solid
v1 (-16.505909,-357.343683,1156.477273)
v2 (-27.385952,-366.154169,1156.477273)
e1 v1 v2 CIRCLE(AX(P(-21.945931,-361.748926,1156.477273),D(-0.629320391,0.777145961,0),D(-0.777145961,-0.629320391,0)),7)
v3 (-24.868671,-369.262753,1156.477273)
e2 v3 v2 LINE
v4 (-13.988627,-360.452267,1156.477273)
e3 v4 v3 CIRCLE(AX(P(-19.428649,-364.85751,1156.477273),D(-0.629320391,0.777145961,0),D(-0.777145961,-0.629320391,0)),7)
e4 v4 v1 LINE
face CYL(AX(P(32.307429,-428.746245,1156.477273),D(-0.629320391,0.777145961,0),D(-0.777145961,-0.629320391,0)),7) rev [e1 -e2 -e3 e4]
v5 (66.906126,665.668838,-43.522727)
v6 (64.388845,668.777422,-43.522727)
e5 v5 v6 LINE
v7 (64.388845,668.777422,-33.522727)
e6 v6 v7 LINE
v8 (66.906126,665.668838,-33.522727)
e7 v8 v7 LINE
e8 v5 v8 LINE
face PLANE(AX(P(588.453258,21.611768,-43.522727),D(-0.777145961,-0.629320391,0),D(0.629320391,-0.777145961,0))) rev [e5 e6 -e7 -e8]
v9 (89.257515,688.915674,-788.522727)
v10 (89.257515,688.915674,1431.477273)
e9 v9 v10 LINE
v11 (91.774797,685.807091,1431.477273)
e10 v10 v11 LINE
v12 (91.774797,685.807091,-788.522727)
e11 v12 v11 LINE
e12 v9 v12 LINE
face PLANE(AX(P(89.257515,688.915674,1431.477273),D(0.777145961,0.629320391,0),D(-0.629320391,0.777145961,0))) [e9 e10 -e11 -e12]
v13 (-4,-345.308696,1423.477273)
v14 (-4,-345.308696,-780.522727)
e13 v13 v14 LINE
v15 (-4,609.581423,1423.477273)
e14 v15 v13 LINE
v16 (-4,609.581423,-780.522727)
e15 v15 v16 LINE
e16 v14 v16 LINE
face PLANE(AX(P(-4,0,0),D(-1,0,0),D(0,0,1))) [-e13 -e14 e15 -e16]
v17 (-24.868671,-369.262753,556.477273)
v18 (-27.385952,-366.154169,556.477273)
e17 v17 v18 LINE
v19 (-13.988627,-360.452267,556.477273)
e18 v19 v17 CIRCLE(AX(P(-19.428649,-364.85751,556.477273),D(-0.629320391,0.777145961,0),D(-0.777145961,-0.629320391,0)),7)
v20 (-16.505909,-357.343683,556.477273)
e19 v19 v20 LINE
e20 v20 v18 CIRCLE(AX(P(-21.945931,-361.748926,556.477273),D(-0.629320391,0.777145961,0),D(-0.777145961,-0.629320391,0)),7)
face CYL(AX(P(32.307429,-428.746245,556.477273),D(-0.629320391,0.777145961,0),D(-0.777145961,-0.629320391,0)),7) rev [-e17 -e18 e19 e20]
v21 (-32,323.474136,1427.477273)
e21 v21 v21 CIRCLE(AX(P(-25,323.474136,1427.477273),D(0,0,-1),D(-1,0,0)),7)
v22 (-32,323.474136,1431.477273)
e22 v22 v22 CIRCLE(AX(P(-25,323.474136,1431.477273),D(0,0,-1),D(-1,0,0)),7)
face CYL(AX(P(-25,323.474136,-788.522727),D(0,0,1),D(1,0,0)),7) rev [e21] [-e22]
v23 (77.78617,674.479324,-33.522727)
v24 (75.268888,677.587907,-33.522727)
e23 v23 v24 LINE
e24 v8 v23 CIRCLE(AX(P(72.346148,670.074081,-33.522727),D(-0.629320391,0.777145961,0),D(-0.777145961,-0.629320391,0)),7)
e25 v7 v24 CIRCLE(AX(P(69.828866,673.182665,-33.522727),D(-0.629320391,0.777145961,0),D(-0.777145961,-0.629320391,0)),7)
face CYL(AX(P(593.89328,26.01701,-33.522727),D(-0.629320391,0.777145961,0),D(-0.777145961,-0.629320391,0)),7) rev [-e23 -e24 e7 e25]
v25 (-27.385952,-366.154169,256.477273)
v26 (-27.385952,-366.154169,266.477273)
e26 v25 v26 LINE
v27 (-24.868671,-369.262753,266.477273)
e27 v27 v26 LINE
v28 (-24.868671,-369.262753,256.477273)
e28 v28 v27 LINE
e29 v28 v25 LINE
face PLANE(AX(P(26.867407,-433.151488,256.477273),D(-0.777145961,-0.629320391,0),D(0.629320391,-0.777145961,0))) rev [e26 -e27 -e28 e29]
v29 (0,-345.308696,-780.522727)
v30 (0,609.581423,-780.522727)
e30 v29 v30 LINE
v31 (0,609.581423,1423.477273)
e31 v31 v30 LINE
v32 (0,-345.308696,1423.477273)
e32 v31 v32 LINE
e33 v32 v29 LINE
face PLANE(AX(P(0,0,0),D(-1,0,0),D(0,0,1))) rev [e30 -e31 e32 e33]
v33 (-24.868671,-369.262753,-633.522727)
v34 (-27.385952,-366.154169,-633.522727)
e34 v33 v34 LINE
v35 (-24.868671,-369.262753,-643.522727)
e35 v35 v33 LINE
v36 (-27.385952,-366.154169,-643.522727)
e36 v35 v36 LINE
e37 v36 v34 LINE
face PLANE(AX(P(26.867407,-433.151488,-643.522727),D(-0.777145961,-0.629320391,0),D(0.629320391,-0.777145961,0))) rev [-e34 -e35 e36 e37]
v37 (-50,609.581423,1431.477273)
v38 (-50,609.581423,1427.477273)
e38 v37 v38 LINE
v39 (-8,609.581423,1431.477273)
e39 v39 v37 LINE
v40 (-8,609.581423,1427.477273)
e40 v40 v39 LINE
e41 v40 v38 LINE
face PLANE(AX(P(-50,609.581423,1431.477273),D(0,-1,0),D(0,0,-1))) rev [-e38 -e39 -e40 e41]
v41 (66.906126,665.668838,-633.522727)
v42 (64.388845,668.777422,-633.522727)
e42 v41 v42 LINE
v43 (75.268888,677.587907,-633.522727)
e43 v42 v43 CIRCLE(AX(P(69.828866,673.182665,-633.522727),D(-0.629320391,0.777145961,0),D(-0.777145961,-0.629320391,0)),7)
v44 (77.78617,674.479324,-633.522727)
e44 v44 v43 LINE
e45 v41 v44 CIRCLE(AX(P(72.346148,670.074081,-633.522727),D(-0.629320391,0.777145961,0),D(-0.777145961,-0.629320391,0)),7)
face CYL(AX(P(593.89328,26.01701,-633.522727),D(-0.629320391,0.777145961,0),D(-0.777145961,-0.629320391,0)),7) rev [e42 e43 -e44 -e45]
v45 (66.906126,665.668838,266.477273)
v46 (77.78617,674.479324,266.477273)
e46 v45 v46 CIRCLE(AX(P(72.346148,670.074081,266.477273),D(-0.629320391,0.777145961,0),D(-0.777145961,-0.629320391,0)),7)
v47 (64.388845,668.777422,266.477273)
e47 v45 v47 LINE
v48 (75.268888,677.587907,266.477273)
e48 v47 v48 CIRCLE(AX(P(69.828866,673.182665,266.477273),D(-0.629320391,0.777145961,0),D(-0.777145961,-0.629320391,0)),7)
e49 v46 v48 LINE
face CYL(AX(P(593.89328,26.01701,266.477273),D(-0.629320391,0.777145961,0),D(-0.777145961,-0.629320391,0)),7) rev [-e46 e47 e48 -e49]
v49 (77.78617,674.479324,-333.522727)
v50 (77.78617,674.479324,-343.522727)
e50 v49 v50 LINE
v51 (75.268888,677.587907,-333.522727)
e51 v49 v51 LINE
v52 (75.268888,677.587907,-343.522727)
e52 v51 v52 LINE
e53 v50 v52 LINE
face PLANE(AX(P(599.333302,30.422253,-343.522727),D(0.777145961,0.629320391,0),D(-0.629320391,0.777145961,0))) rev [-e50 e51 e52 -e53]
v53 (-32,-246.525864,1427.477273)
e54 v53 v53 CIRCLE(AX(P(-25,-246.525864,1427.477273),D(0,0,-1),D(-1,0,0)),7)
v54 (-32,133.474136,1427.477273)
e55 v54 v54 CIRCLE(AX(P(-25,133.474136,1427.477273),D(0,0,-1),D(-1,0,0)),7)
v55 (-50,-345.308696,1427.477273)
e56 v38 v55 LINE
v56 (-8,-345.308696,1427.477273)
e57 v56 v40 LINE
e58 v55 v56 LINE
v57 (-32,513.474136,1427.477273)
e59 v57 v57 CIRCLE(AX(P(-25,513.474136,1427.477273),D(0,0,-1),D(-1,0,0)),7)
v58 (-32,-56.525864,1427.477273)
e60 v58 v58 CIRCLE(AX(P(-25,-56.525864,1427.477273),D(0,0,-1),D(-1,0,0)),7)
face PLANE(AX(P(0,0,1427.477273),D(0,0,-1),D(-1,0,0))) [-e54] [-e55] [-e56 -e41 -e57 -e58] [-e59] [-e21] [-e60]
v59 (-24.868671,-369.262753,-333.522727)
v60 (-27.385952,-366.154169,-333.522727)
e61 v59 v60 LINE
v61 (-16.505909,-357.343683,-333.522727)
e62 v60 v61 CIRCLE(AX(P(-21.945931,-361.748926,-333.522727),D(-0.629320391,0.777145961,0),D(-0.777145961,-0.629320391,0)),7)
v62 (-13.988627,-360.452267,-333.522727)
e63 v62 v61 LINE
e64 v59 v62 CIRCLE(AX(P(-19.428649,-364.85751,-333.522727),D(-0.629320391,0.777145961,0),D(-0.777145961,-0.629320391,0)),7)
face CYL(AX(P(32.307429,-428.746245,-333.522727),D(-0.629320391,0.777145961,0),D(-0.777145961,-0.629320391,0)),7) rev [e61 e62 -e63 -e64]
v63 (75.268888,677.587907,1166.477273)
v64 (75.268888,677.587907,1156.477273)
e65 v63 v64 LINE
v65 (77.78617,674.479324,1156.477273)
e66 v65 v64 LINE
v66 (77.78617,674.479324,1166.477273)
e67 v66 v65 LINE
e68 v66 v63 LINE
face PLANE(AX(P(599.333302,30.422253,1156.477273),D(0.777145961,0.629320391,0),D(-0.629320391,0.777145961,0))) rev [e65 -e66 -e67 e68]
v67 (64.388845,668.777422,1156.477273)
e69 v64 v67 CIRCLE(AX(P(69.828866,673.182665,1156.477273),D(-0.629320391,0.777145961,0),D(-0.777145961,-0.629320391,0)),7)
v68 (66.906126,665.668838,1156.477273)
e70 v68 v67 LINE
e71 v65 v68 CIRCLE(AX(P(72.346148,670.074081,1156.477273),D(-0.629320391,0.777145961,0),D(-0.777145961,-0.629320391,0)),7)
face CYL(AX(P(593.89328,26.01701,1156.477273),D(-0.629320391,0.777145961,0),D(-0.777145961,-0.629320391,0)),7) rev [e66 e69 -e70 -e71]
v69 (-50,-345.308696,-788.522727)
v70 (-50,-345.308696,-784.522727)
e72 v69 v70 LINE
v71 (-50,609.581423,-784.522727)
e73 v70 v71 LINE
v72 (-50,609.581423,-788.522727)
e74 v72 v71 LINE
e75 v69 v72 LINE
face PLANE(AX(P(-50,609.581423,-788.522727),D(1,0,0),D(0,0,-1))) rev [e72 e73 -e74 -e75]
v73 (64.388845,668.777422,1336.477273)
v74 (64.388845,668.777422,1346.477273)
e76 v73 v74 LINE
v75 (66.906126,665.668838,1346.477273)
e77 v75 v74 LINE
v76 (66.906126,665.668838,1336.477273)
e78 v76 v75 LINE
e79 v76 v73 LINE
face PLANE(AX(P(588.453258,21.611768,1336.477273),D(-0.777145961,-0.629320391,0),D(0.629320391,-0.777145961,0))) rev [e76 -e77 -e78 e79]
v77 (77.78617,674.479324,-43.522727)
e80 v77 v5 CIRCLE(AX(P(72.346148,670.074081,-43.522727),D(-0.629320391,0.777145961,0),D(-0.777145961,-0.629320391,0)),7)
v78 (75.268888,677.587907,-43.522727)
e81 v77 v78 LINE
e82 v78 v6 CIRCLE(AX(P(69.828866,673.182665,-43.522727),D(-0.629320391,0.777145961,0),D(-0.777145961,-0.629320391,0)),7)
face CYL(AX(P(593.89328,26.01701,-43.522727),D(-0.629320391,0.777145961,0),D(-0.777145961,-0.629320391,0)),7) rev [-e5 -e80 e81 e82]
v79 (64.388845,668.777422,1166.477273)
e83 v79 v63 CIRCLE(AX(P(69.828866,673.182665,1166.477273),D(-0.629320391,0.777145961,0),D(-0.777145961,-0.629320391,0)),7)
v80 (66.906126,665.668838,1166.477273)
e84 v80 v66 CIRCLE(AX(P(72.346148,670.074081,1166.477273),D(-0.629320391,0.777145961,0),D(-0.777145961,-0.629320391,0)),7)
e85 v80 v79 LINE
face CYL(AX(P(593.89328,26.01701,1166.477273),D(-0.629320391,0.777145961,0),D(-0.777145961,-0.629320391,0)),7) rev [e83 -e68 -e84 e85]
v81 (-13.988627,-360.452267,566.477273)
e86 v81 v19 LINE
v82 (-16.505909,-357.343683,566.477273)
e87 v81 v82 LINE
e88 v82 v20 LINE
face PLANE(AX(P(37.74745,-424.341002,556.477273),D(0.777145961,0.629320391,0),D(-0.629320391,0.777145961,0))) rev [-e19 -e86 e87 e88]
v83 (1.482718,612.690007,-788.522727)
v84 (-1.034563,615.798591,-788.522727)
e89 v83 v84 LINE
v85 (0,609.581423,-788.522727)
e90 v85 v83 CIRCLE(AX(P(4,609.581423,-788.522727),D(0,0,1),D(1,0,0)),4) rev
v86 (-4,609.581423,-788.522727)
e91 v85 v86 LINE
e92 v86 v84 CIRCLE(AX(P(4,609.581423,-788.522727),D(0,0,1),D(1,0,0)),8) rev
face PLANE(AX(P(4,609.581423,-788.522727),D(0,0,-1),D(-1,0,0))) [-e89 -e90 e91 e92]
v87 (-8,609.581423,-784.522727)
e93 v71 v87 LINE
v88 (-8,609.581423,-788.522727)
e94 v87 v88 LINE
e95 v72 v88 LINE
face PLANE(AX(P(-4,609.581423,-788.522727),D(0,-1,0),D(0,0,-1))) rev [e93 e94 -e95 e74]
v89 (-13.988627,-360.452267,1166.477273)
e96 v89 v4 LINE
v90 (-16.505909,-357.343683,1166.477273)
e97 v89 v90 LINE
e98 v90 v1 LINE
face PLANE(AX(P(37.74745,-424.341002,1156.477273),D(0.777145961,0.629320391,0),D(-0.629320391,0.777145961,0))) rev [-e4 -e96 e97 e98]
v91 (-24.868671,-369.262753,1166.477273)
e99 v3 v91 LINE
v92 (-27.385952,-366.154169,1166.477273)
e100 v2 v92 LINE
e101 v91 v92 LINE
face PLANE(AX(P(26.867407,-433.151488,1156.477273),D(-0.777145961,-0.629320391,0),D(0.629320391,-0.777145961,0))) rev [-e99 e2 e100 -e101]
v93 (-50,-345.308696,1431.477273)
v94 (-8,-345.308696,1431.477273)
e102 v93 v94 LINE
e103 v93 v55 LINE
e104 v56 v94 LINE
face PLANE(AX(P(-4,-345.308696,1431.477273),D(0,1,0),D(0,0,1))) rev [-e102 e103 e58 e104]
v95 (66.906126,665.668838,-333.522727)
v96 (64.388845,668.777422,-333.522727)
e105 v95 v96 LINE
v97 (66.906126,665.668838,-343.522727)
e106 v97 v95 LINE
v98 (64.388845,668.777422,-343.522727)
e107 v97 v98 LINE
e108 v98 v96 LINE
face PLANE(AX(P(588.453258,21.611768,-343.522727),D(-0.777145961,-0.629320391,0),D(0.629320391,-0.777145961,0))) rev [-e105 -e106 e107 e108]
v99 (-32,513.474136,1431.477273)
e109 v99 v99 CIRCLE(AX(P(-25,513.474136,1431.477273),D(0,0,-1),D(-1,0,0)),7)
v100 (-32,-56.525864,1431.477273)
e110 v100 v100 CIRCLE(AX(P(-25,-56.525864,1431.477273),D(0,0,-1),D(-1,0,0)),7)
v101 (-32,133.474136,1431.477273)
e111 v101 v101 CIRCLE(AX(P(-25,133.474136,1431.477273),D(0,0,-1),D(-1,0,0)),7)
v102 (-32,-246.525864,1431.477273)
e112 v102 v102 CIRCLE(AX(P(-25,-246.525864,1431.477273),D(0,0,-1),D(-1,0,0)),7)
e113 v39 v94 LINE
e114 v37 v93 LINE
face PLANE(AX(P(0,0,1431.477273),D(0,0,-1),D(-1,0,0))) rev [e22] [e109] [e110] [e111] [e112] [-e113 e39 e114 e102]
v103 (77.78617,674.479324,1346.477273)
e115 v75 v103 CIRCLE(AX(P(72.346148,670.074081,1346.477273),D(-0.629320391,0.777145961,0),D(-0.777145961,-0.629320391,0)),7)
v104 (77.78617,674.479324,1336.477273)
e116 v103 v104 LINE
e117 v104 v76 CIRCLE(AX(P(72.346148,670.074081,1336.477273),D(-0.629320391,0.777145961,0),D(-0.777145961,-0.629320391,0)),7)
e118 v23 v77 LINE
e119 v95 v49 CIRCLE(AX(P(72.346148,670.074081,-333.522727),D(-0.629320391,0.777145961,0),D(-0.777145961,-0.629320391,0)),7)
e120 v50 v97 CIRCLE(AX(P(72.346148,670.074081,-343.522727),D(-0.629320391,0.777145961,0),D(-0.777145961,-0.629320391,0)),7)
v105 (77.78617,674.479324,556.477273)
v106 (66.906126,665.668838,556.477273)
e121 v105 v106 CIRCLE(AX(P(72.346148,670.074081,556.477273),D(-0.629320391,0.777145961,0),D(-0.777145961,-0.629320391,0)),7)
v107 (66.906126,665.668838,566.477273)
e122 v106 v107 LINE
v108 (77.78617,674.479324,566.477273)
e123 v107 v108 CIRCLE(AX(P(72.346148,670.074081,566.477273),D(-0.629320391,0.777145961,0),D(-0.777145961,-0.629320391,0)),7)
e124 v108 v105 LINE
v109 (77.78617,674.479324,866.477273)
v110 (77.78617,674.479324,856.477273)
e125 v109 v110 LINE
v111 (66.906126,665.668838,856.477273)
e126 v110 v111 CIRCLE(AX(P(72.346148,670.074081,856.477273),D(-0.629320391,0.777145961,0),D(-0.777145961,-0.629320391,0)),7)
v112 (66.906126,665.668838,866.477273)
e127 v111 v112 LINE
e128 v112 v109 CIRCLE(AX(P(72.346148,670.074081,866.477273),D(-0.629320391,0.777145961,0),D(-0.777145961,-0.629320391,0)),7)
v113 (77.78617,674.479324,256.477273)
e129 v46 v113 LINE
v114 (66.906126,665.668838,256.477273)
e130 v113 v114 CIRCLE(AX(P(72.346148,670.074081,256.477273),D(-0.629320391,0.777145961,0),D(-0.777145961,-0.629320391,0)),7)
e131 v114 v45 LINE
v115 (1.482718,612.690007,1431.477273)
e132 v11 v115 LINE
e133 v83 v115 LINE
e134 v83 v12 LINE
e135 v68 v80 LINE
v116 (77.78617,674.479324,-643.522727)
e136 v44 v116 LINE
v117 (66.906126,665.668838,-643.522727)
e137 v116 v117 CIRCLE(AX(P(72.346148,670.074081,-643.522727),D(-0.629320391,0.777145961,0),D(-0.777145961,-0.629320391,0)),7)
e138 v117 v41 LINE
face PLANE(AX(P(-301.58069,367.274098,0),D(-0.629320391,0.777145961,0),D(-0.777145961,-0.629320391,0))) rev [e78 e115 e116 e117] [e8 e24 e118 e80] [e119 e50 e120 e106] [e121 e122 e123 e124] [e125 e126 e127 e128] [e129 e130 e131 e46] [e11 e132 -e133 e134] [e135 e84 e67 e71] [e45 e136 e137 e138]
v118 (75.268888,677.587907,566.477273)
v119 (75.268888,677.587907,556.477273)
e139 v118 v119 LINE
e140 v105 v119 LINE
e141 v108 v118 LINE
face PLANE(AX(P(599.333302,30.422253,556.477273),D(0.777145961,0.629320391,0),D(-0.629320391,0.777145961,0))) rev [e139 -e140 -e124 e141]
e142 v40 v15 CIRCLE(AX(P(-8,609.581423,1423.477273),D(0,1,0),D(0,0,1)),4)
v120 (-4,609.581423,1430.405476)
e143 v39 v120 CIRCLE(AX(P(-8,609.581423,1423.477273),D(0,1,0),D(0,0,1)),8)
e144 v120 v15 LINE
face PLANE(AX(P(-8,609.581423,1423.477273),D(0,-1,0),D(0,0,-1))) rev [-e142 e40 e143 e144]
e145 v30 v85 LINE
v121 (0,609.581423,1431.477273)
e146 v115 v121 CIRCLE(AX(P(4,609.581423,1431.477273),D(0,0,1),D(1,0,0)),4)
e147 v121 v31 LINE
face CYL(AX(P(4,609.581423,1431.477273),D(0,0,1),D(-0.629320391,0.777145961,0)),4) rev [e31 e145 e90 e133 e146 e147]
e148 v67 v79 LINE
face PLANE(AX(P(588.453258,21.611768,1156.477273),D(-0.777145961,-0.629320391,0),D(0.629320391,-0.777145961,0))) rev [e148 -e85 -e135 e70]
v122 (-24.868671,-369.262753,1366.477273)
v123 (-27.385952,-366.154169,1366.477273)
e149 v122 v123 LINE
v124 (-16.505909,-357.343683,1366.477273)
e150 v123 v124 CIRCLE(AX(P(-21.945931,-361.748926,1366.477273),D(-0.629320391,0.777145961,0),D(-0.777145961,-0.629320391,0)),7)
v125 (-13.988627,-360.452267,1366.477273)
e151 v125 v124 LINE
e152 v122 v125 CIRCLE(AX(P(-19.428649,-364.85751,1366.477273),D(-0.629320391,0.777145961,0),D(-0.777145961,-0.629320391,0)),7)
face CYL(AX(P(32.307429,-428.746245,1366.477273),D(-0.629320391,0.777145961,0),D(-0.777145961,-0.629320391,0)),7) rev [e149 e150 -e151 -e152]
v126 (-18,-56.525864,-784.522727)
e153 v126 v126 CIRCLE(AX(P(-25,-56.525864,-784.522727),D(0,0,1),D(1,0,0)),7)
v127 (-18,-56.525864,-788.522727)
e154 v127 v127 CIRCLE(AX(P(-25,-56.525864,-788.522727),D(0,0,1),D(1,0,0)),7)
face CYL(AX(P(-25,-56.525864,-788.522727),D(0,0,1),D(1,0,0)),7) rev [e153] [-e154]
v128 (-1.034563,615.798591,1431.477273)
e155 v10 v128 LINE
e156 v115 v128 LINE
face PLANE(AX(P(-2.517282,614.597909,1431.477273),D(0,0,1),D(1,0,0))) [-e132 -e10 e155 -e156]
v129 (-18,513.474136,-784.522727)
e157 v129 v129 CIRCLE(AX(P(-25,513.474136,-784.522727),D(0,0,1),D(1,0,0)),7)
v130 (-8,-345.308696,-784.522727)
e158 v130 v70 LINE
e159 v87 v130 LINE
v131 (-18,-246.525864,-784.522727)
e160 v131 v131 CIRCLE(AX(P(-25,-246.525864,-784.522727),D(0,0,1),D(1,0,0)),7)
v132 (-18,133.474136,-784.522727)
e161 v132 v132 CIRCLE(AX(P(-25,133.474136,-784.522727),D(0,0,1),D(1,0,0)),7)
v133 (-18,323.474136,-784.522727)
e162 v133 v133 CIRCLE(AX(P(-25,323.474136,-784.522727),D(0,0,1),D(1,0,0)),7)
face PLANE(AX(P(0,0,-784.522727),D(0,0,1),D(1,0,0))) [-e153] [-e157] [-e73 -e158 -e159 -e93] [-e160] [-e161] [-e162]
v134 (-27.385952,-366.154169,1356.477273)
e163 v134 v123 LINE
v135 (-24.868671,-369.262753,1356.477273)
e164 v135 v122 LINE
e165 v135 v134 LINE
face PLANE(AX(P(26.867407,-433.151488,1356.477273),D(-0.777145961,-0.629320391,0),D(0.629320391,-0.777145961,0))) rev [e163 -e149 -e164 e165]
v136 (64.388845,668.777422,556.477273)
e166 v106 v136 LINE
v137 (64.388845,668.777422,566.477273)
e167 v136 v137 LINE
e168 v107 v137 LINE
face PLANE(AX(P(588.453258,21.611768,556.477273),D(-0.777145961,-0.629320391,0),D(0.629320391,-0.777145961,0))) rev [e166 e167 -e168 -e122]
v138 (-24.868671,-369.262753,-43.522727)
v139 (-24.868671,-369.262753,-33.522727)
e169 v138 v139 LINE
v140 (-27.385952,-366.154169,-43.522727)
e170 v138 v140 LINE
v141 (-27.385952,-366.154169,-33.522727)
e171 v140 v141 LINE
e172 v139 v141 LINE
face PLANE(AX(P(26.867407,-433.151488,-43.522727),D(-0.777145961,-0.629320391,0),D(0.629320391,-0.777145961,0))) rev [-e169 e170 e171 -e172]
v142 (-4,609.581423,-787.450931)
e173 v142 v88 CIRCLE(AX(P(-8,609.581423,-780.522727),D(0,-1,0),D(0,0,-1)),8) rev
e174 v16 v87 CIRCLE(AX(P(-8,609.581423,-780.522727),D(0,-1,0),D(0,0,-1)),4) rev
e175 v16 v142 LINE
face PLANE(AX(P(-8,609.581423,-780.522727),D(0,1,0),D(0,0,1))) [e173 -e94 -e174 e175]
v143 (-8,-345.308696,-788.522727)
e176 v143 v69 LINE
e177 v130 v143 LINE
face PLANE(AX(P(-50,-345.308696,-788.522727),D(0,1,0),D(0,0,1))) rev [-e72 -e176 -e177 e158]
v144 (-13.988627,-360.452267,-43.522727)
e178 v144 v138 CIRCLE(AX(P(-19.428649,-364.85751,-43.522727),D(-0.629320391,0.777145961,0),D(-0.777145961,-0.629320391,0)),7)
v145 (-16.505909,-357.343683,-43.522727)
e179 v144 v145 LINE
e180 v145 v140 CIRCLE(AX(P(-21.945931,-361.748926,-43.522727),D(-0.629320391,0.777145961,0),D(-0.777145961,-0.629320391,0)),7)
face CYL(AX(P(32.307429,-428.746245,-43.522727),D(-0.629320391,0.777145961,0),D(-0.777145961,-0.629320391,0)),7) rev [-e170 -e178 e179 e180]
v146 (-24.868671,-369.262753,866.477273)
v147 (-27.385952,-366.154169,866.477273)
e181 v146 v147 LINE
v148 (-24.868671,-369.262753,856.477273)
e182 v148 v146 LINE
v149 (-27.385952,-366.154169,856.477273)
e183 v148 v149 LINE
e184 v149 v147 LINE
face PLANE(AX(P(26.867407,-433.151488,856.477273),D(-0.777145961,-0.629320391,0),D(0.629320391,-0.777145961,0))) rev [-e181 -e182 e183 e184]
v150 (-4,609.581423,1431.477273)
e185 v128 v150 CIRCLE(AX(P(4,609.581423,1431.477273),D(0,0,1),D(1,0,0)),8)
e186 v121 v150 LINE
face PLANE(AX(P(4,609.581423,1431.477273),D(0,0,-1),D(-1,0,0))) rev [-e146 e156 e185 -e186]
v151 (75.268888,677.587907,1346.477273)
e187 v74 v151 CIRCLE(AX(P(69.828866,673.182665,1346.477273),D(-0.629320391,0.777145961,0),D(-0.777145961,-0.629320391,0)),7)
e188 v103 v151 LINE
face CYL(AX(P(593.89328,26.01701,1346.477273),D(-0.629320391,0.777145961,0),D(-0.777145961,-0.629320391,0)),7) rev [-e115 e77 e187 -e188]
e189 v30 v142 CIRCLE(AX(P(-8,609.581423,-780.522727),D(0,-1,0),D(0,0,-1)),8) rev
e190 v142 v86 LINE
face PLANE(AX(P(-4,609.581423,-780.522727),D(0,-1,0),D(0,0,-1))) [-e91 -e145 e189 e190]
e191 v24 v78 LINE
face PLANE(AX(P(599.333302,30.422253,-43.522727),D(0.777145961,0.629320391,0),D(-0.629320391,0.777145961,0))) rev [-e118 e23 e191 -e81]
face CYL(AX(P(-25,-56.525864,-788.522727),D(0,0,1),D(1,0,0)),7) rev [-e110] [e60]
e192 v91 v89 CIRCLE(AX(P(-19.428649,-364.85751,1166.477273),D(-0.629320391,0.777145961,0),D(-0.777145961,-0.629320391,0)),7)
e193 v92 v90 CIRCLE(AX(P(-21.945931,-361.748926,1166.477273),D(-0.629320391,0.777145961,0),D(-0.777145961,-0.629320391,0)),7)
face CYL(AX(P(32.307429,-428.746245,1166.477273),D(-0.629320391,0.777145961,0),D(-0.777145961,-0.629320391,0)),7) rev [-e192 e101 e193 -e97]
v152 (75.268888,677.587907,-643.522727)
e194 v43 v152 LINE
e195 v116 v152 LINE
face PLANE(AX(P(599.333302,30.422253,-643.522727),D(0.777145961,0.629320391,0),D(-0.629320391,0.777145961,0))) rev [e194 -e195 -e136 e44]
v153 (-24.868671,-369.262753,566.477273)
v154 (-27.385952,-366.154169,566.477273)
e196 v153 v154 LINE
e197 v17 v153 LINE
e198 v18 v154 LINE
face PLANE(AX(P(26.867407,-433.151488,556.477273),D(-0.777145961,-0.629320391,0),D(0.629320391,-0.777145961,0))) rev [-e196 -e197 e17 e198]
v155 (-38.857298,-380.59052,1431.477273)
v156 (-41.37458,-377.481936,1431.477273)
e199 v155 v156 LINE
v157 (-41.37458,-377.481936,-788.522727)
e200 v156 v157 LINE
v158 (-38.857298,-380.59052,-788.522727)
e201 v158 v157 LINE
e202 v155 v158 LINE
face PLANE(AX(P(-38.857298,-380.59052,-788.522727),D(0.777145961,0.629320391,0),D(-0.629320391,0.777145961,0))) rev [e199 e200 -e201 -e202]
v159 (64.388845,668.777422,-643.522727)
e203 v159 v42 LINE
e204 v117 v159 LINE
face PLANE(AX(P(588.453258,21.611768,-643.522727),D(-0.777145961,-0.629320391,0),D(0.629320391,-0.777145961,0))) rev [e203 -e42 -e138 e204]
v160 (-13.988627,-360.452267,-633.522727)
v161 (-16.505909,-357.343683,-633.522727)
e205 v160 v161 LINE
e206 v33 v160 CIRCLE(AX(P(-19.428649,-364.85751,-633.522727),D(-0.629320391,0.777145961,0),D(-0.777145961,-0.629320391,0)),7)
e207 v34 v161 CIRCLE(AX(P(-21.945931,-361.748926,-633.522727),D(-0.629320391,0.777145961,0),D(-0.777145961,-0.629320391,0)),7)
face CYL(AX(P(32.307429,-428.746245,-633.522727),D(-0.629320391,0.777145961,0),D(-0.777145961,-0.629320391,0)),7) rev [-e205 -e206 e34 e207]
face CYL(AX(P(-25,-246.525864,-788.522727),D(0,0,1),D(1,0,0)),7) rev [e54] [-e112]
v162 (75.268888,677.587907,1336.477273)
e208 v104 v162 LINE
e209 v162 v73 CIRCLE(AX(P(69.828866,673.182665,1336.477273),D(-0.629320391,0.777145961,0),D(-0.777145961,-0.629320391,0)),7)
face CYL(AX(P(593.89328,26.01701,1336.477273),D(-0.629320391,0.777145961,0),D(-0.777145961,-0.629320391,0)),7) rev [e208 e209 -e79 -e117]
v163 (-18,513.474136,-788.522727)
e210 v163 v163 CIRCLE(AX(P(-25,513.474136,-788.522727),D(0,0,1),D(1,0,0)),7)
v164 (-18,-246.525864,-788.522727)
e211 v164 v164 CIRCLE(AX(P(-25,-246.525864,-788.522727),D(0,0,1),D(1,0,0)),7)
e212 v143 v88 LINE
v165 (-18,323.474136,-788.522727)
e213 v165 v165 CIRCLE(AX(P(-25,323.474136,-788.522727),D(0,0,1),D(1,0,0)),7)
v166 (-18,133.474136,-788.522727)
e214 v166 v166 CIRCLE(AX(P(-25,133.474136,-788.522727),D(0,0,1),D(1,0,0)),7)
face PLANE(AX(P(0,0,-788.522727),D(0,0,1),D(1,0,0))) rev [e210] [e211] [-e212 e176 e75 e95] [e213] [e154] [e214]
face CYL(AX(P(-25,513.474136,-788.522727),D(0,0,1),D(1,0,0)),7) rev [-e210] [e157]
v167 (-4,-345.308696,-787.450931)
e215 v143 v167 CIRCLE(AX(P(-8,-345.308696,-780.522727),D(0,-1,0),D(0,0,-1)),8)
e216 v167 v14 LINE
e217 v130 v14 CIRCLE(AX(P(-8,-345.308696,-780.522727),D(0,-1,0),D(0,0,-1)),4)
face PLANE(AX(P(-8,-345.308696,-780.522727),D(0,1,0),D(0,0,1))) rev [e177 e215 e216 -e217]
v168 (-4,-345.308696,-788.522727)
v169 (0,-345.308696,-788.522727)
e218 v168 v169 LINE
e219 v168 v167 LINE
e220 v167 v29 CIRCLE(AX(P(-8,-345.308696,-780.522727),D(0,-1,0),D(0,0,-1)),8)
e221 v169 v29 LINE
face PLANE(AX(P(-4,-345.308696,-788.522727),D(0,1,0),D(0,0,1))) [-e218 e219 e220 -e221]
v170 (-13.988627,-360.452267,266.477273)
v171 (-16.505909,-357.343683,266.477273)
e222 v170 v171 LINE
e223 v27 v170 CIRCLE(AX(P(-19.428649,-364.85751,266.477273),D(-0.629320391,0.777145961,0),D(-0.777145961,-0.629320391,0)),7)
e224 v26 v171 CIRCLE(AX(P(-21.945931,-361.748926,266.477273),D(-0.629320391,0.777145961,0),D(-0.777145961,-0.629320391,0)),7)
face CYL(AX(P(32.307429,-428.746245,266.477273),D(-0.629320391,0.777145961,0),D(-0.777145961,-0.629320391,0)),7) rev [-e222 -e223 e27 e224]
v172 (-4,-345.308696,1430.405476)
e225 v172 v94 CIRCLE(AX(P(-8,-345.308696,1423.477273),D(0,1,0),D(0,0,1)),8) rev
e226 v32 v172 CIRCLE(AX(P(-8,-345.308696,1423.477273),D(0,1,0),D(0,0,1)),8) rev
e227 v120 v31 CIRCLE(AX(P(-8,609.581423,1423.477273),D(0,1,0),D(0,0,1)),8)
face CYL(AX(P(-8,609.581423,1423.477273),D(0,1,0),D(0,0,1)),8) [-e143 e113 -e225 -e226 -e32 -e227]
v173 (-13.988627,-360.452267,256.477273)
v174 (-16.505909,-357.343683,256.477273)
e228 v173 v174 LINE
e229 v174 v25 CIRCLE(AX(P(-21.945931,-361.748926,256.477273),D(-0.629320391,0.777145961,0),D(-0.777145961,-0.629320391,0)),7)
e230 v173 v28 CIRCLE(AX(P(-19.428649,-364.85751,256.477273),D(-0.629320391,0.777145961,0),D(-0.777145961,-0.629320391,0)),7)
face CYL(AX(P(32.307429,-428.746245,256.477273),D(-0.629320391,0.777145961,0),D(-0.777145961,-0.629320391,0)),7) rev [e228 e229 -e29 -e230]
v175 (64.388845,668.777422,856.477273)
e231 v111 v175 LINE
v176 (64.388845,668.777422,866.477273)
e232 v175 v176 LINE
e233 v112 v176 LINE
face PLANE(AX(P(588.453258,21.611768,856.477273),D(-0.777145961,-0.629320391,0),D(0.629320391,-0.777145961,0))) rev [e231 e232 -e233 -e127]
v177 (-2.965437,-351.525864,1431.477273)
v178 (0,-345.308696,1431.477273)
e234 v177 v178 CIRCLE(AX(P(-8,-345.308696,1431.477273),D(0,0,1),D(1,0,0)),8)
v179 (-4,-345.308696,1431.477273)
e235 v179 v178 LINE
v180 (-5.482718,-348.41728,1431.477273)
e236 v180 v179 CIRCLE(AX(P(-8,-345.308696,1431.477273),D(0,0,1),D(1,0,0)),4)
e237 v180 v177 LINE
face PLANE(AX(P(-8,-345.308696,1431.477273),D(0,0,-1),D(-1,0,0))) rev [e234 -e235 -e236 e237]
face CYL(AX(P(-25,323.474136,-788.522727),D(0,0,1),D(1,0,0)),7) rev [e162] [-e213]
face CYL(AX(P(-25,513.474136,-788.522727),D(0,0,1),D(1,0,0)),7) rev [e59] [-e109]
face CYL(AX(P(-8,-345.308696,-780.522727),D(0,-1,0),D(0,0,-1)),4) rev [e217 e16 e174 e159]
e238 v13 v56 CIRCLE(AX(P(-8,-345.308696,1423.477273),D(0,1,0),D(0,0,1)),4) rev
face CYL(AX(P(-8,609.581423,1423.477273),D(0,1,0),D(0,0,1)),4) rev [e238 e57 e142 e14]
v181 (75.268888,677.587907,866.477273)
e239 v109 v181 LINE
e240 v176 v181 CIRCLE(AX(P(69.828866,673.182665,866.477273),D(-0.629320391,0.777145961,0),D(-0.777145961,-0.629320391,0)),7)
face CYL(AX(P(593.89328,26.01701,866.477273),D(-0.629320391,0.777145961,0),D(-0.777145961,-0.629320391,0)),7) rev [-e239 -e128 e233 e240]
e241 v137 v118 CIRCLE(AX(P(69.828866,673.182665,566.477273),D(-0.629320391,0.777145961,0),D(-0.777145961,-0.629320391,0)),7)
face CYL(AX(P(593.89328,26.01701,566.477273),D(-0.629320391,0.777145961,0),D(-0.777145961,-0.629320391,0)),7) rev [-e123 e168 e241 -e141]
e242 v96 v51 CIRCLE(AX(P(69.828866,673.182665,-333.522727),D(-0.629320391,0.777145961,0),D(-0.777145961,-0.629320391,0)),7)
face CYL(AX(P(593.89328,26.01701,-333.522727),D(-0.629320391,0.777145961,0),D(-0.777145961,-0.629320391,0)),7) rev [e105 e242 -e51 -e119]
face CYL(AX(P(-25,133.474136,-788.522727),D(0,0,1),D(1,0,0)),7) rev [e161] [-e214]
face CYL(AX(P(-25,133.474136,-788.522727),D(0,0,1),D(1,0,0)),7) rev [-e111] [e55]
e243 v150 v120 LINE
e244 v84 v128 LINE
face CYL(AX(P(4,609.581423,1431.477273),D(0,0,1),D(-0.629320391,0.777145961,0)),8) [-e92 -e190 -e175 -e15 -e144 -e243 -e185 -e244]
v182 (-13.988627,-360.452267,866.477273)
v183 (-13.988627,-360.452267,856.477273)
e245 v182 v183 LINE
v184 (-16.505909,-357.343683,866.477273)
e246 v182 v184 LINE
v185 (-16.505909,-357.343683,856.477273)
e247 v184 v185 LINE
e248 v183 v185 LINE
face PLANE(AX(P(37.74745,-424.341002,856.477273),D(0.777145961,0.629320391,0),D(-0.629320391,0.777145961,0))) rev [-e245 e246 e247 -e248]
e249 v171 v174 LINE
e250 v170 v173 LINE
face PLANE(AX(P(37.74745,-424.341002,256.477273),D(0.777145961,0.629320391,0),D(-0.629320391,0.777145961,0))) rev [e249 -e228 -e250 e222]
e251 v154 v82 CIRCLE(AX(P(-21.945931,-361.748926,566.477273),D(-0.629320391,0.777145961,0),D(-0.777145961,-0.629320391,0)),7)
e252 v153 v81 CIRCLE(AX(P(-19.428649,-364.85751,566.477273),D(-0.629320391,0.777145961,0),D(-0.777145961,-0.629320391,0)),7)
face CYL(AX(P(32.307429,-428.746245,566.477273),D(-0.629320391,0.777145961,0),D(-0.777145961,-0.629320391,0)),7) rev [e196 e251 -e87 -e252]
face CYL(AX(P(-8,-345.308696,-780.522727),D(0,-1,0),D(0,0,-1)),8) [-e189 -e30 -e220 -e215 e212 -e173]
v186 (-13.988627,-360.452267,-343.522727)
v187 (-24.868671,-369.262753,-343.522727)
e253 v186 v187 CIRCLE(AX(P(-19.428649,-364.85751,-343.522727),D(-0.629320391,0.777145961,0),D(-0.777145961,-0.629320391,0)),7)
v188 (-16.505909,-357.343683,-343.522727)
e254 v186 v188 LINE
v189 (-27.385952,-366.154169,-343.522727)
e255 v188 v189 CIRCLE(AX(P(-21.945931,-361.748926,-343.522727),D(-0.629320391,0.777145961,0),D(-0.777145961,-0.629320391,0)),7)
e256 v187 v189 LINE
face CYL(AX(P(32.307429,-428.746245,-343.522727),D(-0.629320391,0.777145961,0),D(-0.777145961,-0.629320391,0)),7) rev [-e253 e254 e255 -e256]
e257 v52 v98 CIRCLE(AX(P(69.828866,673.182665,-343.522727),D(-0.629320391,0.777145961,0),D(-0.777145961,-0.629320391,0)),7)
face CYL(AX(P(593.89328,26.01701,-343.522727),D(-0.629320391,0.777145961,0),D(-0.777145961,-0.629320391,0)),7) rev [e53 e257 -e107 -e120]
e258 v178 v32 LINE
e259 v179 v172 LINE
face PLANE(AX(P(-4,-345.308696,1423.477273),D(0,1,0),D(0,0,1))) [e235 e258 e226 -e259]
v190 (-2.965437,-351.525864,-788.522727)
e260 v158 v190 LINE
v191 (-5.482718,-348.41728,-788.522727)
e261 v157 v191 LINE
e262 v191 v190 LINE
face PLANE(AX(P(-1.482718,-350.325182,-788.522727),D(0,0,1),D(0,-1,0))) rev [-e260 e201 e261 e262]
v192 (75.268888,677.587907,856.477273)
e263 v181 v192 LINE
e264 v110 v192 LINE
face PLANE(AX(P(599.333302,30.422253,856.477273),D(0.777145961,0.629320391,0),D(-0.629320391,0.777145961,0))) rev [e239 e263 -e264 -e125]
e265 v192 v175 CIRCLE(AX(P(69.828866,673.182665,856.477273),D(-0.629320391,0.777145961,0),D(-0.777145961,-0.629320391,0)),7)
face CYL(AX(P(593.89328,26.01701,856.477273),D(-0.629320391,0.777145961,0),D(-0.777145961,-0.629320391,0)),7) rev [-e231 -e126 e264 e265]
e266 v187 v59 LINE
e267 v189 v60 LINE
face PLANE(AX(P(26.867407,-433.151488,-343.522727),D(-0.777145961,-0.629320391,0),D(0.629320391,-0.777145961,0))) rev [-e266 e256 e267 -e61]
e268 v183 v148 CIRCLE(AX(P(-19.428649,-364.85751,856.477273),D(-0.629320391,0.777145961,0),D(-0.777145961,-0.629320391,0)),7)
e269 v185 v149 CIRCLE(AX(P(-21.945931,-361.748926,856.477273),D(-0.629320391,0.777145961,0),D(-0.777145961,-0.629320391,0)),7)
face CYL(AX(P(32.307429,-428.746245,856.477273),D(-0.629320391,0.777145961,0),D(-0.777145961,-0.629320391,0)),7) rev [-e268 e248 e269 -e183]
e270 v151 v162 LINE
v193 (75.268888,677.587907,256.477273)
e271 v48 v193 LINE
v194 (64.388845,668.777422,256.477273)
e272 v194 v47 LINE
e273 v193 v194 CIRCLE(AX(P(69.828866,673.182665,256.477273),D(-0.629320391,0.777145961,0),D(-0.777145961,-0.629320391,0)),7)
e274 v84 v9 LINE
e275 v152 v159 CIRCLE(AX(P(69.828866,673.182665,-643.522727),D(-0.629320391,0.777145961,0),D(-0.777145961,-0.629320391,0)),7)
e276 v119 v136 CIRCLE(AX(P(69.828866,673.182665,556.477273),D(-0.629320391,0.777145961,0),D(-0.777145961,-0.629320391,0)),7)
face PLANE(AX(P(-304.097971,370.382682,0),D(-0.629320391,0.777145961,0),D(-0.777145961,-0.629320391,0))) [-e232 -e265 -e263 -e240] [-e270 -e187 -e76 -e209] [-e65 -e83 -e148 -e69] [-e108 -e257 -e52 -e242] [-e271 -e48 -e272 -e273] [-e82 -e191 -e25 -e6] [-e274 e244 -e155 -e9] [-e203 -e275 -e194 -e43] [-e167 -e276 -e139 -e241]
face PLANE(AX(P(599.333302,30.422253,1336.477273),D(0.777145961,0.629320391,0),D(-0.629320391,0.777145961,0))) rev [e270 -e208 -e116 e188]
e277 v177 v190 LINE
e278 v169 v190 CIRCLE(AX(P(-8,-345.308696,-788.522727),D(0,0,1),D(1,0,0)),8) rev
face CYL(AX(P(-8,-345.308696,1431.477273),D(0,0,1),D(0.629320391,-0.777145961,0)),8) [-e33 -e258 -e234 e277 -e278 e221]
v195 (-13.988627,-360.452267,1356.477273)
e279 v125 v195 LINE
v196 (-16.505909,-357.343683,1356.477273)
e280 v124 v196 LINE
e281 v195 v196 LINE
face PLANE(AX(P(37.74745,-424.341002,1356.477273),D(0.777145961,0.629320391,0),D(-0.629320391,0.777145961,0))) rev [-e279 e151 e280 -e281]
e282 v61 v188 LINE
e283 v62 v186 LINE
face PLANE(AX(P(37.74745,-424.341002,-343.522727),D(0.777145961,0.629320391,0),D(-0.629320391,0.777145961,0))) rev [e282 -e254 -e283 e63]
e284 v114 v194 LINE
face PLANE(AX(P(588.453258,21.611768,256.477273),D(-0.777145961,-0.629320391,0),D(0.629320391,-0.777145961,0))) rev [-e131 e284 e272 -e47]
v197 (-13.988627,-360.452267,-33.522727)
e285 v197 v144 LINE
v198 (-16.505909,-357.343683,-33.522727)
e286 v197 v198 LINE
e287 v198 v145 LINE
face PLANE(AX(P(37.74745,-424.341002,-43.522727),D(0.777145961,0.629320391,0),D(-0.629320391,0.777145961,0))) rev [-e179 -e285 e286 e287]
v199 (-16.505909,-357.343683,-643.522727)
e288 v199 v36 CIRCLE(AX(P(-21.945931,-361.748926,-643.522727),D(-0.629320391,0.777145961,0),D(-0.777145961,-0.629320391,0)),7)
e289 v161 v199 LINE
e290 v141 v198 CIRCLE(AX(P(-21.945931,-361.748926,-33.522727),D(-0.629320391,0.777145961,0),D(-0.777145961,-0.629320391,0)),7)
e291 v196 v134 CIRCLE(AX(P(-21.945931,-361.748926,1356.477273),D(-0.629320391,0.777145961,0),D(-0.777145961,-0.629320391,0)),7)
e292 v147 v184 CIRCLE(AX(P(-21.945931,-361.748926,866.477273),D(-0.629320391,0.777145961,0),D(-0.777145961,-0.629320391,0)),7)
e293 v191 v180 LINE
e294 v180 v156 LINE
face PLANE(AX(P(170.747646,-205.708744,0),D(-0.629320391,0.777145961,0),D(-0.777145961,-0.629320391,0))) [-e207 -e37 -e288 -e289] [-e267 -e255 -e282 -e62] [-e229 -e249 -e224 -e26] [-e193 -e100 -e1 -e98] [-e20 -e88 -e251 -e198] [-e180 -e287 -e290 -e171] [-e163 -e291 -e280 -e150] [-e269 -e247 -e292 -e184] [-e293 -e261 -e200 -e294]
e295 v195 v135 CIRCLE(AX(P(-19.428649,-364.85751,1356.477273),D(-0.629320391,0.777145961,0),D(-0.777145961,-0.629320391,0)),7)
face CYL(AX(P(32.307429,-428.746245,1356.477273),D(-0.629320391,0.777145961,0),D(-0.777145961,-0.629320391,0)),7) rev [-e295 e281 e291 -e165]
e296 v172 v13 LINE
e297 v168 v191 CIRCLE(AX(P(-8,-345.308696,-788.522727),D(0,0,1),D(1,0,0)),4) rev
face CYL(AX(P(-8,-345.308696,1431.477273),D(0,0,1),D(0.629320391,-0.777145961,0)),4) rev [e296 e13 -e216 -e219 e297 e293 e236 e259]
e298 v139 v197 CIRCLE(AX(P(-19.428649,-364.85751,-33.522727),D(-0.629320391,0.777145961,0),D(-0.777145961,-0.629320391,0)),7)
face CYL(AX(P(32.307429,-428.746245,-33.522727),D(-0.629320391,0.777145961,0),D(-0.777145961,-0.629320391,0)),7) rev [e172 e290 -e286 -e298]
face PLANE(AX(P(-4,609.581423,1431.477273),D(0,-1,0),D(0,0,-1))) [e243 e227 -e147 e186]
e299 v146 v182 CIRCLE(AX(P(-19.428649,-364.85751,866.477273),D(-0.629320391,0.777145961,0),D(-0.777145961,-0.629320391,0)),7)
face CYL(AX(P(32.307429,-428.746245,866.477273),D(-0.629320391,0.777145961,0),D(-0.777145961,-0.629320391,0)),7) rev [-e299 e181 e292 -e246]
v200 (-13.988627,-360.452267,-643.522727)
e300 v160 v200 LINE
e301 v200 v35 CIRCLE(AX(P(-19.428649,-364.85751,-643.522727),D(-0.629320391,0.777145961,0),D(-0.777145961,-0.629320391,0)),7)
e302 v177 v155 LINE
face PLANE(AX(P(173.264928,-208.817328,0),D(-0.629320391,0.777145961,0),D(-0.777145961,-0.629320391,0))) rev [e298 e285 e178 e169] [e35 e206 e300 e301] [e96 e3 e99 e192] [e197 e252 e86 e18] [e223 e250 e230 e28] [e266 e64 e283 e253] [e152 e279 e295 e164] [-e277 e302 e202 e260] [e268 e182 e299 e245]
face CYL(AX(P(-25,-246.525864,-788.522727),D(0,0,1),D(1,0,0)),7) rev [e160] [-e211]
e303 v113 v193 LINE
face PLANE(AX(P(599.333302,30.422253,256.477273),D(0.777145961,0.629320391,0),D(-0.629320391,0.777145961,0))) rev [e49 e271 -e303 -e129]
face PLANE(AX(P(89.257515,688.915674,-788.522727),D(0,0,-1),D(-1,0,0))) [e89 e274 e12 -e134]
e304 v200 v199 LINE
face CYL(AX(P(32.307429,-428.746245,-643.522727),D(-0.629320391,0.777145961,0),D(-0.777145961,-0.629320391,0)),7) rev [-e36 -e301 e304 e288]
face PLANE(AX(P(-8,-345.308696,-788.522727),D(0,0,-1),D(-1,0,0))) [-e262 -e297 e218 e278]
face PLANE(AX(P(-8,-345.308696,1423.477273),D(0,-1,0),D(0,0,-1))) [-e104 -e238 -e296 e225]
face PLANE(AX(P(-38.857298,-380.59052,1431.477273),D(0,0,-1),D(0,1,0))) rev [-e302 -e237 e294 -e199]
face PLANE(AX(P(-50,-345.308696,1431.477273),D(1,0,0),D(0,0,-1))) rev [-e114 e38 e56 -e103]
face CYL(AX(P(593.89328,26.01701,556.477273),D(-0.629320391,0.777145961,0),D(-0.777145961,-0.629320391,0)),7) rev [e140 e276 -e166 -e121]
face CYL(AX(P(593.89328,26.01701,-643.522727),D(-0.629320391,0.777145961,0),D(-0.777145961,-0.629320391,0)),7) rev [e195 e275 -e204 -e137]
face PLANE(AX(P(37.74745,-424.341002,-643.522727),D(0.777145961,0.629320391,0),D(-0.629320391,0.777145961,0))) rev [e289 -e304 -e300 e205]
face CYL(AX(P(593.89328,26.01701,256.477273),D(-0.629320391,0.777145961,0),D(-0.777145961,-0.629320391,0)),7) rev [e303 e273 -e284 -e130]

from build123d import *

# Parameters (mm, degrees)
SKETCH1_W                    = 2220
SKETCH1_H                    = 969
BASE_FLANGE1_DEPTH           = 4
EDGE_FLANGE1_START           = -788.522727273
EDGE_FLANGE1_DEPTH           = 2220
EDGE_FLANGE1_2_DEPTH         = 2220
EDGE_FLANGE2_START           = -788.522727273
EDGE_FLANGE2_DEPTH           = 2220
EDGE_FLANGE2_2_DEPTH         = 2220
EDGE_FLANGE3_STRIP_W         = 24
EDGE_FLANGE3_STRIP_H         = 4
EDGE_FLANGE3_STRIP_CUT_DEPTH = 954.890119211
EDGE_FLANGE3_DEPTH           = 954.890119211
EDGE_FLANGE4_STRIP_W         = 24
EDGE_FLANGE4_STRIP_H         = 4
EDGE_FLANGE4_STRIP_CUT_DEPTH = 954.890119211
EDGE_FLANGE4_DEPTH           = 954.890119211
CUT_EXTRUDE1_DEPTH           = 1665.596730593
LPATTERN1_COUNT              = 7
LPATTERN1_PITCH              = 300
CUT_EXTRUDE2_DEPTH           = 1665.596730593
CUT_EXTRUDE2_DEPTH_BACK      = 1665.596730593
SKETCH20_R                   = 7
CUT_EXTRUDE3_DEPTH           = 2327.247497544
LPATTERN2_COUNT              = 5
LPATTERN2_PITCH              = 190
CUT_EXTRUDE4_DEPTH           = 1704.160586281
LPATTERN3_COUNT              = 7
LPATTERN3_PITCH              = 300
CUT_EXTRUDE5_DEPTH           = 1704.160586281
CUT_EXTRUDE5_DEPTH_BACK      = 1704.160586281


# Read off the part's stored shape, not the designer's step: Edge-Flange1, Edge-Flange2
# Sheet-metal steps are written as plain solids
with BuildPart() as part:
    # Sketch1 → Base-Flange1 (new body)
    with BuildSketch(Plane(origin=(0, 0, 0), x_dir=(0, 0, -1), z_dir=(1, 0, 0))):
        with Locations((-321.477272727, 132.136363636)):
            Rectangle(SKETCH1_W, SKETCH1_H)
    extrude(amount=-BASE_FLANGE1_DEPTH)

    # Edge-Flange1 outline → Edge-Flange1 (cut)
    with BuildSketch(Plane.XY.offset(EDGE_FLANGE1_START)):
        with BuildLine():
            ThreePointArc((-4, 609.581423242), (-3.220682275, 613.025512017), (-1.034563128, 615.798590934))
            Line((-1.034563128, 615.798590934), (0, 616.636363636))
            Line((0, 616.636363636), (-4, 616.636363636))
            Line((-4, 616.636363636), (-4, 609.581423242))
        make_face()
    extrude(amount=EDGE_FLANGE1_DEPTH, mode=Mode.SUBTRACT)

    # Edge-Flange1 2 outline → Edge-Flange1 2 (add)
    with BuildSketch(Plane.XY.offset(EDGE_FLANGE1_START)):
        with BuildLine():
            Line((89.257515375, 688.91567443), (0, 616.636363636))
            Line((0, 616.636363636), (0, 609.581423242))
            ThreePointArc((0, 609.581423242), (0.389658863, 611.303467629), (1.482718436, 612.690007088))
            Line((1.482718436, 612.690007088), (91.774796939, 685.807090584))
            Line((91.774796939, 685.807090584), (89.257515375, 688.91567443))
        make_face()
    extrude(amount=EDGE_FLANGE1_2_DEPTH)

    # Edge-Flange2 outline → Edge-Flange2 (cut)
    with BuildSketch(Plane.XY.offset(EDGE_FLANGE2_START)):
        with BuildLine():
            ThreePointArc((0, -345.308695969), (-0.779317725, -348.752784744), (-2.965436872, -351.525863661))
            Line((-2.965436872, -351.525863661), (-4, -352.363636364))
            Line((-4, -352.363636364), (0, -352.363636364))
            Line((0, -352.363636364), (0, -345.308695969))
        make_face()
    extrude(amount=EDGE_FLANGE2_DEPTH, mode=Mode.SUBTRACT)

    # Edge-Flange2 2 outline → Edge-Flange2 2 (add)
    with BuildSketch(Plane.XY.offset(EDGE_FLANGE2_START)):
        with BuildLine():
            Line((-38.857298073, -380.590519783), (-4, -352.363636364))
            Line((-4, -352.363636364), (-4, -345.308695969))
            ThreePointArc((-4, -345.308695969), (-4.389658863, -347.030740356), (-5.482718436, -348.417279815))
            Line((-5.482718436, -348.417279815), (-41.374579637, -377.481935938))
            Line((-41.374579637, -377.481935938), (-38.857298073, -380.590519783))
        make_face()
    extrude(amount=EDGE_FLANGE2_2_DEPTH)

    # Edge-Flange3 strip (across the edge) → Edge-Flange3 strip cut (cut)
    with BuildSketch(Plane(origin=(-4, -345.308695969, 1431.477272727), x_dir=(0, 0, -1), z_dir=(0, 1, 0))):
        with Locations((-4, -2)):
            Rectangle(EDGE_FLANGE3_STRIP_W, EDGE_FLANGE3_STRIP_H)
    extrude(amount=EDGE_FLANGE3_STRIP_CUT_DEPTH, mode=Mode.SUBTRACT)

    # Edge-Flange3 section (across the edge) → Edge-Flange3 (add)
    with BuildSketch(Plane(origin=(-4, -345.308695969, 1431.477272727), x_dir=(0, 0, -1), z_dir=(0, 1, 0))):
        with BuildLine():
            Line((0, 4), (0, 46))
            Line((0, 46), (4, 46))
            Line((4, 46), (4, 4))
            ThreePointArc((4, 4), (5.171572875, 1.171572875), (8, 0))
            Line((8, 0), (8, -4))
            ThreePointArc((8, -4), (2.343145751, -1.656854249), (0, 4))
        make_face()
    extrude(amount=EDGE_FLANGE3_DEPTH)

    # Edge-Flange4 strip (across the edge) → Edge-Flange4 strip cut (cut)
    with BuildSketch(Plane(origin=(-4, 609.581423242, -788.522727273), x_dir=(0, 0, 1), z_dir=(0, -1, 0))):
        with Locations((-4, -2)):
            Rectangle(EDGE_FLANGE4_STRIP_W, EDGE_FLANGE4_STRIP_H)
    extrude(amount=EDGE_FLANGE4_STRIP_CUT_DEPTH, mode=Mode.SUBTRACT)

    # Edge-Flange4 section (across the edge) → Edge-Flange4 (add)
    with BuildSketch(Plane(origin=(-4, 609.581423242, -788.522727273), x_dir=(0, 0, 1), z_dir=(0, -1, 0))):
        with BuildLine():
            Line((0, 4), (0, 46))
            Line((0, 46), (4, 46))
            Line((4, 46), (4, 4))
            ThreePointArc((4, 4), (5.171572875, 1.171572875), (8, 0))
            Line((8, 0), (8, -4))
            ThreePointArc((8, -4), (2.343145751, -1.656854249), (0, 4))
        make_face()
    extrude(amount=EDGE_FLANGE4_DEPTH)

    # Sketch18 → Cut-Extrude1 (cut, symmetric)
    with BuildSketch(Plane(origin=(-301.580689808, 372.42113631, 0), x_dir=(0.7771459614569678, 0.6293203910498413, 0), z_dir=(-0.6293203910498413, 0.7771459614569678, 0))):
        with BuildLine():
            Line((484.914799236, 643.522727273), (484.914799236, 633.522727273))
            ThreePointArc((484.914799236, 633.522727273), (477.914799236, 626.522727273), (470.914799236, 633.522727273))
            Line((470.914799236, 633.522727273), (470.914799236, 643.522727273))
            ThreePointArc((470.914799236, 643.522727273), (477.914799236, 650.522727273), (484.914799236, 643.522727273))
        make_face()
    cut_extrude1 = extrude(amount=CUT_EXTRUDE1_DEPTH, both=True, mode=Mode.SUBTRACT)

    # LPattern1: Cut-Extrude1 ×7
    with Locations(*[(0, 0, i * LPATTERN1_PITCH) for i in range(1, LPATTERN1_COUNT)]):
        add(cut_extrude1, mode=Mode.SUBTRACT)

    # Sketch19 → Cut-Extrude2 (cut, two sides: drawn at the far end of the back side and taken through both)
    with BuildSketch(Plane(origin=(-301.580689808, 372.42113631, 0), x_dir=(0.7771459614569678, 0.6293203910498413, 0), z_dir=(-0.6293203910498413, 0.7771459614569678, 0)).offset(-CUT_EXTRUDE2_DEPTH_BACK)):
        with BuildLine():
            Line((484.914799236, -1336.477272727), (484.914799236, -1346.477272727))
            ThreePointArc((484.914799236, -1346.477272727), (477.914799236, -1353.477272727), (470.914799236, -1346.477272727))
            Line((470.914799236, -1346.477272727), (470.914799236, -1336.477272727))
            ThreePointArc((470.914799236, -1336.477272727), (477.914799236, -1329.477272727), (484.914799236, -1336.477272727))
        make_face()
    extrude(amount=CUT_EXTRUDE2_DEPTH + CUT_EXTRUDE2_DEPTH_BACK, mode=Mode.SUBTRACT)

    # Sketch20 → Cut-Extrude3 (cut, symmetric)
    with BuildSketch(Plane.XY.offset(1431.477272727)):
        with Locations((-25, -246.525863661)):
            Circle(SKETCH20_R)
    cut_extrude3 = extrude(amount=CUT_EXTRUDE3_DEPTH, both=True, mode=Mode.SUBTRACT)

    # LPattern2: Cut-Extrude3 ×5
    with Locations(*[(0, i * LPATTERN2_PITCH, 0) for i in range(1, LPATTERN2_COUNT)]):
        add(cut_extrude3, mode=Mode.SUBTRACT)

    # Sketch21 → Cut-Extrude4 (cut, symmetric)
    with BuildSketch(Plane(origin=(168.230364565, -207.747198844, 0), x_dir=(0.7771459614569676, 0.6293203910498416, 0), z_dir=(-0.6293203910498416, 0.7771459614569677, 0))):
        with BuildLine():
            Line((-237.71116701, 643.522727273), (-237.71116701, 633.522727273))
            ThreePointArc((-237.71116701, 633.522727273), (-244.71116701, 626.522727273), (-251.71116701, 633.522727273))
            Line((-251.71116701, 633.522727273), (-251.71116701, 643.522727273))
            ThreePointArc((-251.71116701, 643.522727273), (-244.71116701, 650.522727273), (-237.71116701, 643.522727273))
        make_face()
    cut_extrude4 = extrude(amount=CUT_EXTRUDE4_DEPTH, both=True, mode=Mode.SUBTRACT)

    # LPattern3: Cut-Extrude4 ×7
    with Locations(*[(0, 0, i * LPATTERN3_PITCH) for i in range(1, LPATTERN3_COUNT)]):
        add(cut_extrude4, mode=Mode.SUBTRACT)

    # Sketch22 → Cut-Extrude5 (cut, two sides: drawn at the far end of the back side and taken through both)
    with BuildSketch(Plane(origin=(168.230364565, -207.747198844, 0), x_dir=(0.7771459614569676, 0.6293203910498416, 0), z_dir=(-0.6293203910498416, 0.7771459614569677, 0)).offset(-CUT_EXTRUDE5_DEPTH_BACK)):
        with BuildLine():
            Line((-237.71116701, -1356.477272727), (-237.71116701, -1366.477272727))
            ThreePointArc((-237.71116701, -1366.477272727), (-244.71116701, -1373.477272727), (-251.71116701, -1366.477272727))
            Line((-251.71116701, -1366.477272727), (-251.71116701, -1356.477272727))
            ThreePointArc((-251.71116701, -1356.477272727), (-244.71116701, -1349.477272727), (-237.71116701, -1356.477272727))
        make_face()
    extrude(amount=CUT_EXTRUDE5_DEPTH + CUT_EXTRUDE5_DEPTH_BACK, mode=Mode.SUBTRACT)


solid = part.part
